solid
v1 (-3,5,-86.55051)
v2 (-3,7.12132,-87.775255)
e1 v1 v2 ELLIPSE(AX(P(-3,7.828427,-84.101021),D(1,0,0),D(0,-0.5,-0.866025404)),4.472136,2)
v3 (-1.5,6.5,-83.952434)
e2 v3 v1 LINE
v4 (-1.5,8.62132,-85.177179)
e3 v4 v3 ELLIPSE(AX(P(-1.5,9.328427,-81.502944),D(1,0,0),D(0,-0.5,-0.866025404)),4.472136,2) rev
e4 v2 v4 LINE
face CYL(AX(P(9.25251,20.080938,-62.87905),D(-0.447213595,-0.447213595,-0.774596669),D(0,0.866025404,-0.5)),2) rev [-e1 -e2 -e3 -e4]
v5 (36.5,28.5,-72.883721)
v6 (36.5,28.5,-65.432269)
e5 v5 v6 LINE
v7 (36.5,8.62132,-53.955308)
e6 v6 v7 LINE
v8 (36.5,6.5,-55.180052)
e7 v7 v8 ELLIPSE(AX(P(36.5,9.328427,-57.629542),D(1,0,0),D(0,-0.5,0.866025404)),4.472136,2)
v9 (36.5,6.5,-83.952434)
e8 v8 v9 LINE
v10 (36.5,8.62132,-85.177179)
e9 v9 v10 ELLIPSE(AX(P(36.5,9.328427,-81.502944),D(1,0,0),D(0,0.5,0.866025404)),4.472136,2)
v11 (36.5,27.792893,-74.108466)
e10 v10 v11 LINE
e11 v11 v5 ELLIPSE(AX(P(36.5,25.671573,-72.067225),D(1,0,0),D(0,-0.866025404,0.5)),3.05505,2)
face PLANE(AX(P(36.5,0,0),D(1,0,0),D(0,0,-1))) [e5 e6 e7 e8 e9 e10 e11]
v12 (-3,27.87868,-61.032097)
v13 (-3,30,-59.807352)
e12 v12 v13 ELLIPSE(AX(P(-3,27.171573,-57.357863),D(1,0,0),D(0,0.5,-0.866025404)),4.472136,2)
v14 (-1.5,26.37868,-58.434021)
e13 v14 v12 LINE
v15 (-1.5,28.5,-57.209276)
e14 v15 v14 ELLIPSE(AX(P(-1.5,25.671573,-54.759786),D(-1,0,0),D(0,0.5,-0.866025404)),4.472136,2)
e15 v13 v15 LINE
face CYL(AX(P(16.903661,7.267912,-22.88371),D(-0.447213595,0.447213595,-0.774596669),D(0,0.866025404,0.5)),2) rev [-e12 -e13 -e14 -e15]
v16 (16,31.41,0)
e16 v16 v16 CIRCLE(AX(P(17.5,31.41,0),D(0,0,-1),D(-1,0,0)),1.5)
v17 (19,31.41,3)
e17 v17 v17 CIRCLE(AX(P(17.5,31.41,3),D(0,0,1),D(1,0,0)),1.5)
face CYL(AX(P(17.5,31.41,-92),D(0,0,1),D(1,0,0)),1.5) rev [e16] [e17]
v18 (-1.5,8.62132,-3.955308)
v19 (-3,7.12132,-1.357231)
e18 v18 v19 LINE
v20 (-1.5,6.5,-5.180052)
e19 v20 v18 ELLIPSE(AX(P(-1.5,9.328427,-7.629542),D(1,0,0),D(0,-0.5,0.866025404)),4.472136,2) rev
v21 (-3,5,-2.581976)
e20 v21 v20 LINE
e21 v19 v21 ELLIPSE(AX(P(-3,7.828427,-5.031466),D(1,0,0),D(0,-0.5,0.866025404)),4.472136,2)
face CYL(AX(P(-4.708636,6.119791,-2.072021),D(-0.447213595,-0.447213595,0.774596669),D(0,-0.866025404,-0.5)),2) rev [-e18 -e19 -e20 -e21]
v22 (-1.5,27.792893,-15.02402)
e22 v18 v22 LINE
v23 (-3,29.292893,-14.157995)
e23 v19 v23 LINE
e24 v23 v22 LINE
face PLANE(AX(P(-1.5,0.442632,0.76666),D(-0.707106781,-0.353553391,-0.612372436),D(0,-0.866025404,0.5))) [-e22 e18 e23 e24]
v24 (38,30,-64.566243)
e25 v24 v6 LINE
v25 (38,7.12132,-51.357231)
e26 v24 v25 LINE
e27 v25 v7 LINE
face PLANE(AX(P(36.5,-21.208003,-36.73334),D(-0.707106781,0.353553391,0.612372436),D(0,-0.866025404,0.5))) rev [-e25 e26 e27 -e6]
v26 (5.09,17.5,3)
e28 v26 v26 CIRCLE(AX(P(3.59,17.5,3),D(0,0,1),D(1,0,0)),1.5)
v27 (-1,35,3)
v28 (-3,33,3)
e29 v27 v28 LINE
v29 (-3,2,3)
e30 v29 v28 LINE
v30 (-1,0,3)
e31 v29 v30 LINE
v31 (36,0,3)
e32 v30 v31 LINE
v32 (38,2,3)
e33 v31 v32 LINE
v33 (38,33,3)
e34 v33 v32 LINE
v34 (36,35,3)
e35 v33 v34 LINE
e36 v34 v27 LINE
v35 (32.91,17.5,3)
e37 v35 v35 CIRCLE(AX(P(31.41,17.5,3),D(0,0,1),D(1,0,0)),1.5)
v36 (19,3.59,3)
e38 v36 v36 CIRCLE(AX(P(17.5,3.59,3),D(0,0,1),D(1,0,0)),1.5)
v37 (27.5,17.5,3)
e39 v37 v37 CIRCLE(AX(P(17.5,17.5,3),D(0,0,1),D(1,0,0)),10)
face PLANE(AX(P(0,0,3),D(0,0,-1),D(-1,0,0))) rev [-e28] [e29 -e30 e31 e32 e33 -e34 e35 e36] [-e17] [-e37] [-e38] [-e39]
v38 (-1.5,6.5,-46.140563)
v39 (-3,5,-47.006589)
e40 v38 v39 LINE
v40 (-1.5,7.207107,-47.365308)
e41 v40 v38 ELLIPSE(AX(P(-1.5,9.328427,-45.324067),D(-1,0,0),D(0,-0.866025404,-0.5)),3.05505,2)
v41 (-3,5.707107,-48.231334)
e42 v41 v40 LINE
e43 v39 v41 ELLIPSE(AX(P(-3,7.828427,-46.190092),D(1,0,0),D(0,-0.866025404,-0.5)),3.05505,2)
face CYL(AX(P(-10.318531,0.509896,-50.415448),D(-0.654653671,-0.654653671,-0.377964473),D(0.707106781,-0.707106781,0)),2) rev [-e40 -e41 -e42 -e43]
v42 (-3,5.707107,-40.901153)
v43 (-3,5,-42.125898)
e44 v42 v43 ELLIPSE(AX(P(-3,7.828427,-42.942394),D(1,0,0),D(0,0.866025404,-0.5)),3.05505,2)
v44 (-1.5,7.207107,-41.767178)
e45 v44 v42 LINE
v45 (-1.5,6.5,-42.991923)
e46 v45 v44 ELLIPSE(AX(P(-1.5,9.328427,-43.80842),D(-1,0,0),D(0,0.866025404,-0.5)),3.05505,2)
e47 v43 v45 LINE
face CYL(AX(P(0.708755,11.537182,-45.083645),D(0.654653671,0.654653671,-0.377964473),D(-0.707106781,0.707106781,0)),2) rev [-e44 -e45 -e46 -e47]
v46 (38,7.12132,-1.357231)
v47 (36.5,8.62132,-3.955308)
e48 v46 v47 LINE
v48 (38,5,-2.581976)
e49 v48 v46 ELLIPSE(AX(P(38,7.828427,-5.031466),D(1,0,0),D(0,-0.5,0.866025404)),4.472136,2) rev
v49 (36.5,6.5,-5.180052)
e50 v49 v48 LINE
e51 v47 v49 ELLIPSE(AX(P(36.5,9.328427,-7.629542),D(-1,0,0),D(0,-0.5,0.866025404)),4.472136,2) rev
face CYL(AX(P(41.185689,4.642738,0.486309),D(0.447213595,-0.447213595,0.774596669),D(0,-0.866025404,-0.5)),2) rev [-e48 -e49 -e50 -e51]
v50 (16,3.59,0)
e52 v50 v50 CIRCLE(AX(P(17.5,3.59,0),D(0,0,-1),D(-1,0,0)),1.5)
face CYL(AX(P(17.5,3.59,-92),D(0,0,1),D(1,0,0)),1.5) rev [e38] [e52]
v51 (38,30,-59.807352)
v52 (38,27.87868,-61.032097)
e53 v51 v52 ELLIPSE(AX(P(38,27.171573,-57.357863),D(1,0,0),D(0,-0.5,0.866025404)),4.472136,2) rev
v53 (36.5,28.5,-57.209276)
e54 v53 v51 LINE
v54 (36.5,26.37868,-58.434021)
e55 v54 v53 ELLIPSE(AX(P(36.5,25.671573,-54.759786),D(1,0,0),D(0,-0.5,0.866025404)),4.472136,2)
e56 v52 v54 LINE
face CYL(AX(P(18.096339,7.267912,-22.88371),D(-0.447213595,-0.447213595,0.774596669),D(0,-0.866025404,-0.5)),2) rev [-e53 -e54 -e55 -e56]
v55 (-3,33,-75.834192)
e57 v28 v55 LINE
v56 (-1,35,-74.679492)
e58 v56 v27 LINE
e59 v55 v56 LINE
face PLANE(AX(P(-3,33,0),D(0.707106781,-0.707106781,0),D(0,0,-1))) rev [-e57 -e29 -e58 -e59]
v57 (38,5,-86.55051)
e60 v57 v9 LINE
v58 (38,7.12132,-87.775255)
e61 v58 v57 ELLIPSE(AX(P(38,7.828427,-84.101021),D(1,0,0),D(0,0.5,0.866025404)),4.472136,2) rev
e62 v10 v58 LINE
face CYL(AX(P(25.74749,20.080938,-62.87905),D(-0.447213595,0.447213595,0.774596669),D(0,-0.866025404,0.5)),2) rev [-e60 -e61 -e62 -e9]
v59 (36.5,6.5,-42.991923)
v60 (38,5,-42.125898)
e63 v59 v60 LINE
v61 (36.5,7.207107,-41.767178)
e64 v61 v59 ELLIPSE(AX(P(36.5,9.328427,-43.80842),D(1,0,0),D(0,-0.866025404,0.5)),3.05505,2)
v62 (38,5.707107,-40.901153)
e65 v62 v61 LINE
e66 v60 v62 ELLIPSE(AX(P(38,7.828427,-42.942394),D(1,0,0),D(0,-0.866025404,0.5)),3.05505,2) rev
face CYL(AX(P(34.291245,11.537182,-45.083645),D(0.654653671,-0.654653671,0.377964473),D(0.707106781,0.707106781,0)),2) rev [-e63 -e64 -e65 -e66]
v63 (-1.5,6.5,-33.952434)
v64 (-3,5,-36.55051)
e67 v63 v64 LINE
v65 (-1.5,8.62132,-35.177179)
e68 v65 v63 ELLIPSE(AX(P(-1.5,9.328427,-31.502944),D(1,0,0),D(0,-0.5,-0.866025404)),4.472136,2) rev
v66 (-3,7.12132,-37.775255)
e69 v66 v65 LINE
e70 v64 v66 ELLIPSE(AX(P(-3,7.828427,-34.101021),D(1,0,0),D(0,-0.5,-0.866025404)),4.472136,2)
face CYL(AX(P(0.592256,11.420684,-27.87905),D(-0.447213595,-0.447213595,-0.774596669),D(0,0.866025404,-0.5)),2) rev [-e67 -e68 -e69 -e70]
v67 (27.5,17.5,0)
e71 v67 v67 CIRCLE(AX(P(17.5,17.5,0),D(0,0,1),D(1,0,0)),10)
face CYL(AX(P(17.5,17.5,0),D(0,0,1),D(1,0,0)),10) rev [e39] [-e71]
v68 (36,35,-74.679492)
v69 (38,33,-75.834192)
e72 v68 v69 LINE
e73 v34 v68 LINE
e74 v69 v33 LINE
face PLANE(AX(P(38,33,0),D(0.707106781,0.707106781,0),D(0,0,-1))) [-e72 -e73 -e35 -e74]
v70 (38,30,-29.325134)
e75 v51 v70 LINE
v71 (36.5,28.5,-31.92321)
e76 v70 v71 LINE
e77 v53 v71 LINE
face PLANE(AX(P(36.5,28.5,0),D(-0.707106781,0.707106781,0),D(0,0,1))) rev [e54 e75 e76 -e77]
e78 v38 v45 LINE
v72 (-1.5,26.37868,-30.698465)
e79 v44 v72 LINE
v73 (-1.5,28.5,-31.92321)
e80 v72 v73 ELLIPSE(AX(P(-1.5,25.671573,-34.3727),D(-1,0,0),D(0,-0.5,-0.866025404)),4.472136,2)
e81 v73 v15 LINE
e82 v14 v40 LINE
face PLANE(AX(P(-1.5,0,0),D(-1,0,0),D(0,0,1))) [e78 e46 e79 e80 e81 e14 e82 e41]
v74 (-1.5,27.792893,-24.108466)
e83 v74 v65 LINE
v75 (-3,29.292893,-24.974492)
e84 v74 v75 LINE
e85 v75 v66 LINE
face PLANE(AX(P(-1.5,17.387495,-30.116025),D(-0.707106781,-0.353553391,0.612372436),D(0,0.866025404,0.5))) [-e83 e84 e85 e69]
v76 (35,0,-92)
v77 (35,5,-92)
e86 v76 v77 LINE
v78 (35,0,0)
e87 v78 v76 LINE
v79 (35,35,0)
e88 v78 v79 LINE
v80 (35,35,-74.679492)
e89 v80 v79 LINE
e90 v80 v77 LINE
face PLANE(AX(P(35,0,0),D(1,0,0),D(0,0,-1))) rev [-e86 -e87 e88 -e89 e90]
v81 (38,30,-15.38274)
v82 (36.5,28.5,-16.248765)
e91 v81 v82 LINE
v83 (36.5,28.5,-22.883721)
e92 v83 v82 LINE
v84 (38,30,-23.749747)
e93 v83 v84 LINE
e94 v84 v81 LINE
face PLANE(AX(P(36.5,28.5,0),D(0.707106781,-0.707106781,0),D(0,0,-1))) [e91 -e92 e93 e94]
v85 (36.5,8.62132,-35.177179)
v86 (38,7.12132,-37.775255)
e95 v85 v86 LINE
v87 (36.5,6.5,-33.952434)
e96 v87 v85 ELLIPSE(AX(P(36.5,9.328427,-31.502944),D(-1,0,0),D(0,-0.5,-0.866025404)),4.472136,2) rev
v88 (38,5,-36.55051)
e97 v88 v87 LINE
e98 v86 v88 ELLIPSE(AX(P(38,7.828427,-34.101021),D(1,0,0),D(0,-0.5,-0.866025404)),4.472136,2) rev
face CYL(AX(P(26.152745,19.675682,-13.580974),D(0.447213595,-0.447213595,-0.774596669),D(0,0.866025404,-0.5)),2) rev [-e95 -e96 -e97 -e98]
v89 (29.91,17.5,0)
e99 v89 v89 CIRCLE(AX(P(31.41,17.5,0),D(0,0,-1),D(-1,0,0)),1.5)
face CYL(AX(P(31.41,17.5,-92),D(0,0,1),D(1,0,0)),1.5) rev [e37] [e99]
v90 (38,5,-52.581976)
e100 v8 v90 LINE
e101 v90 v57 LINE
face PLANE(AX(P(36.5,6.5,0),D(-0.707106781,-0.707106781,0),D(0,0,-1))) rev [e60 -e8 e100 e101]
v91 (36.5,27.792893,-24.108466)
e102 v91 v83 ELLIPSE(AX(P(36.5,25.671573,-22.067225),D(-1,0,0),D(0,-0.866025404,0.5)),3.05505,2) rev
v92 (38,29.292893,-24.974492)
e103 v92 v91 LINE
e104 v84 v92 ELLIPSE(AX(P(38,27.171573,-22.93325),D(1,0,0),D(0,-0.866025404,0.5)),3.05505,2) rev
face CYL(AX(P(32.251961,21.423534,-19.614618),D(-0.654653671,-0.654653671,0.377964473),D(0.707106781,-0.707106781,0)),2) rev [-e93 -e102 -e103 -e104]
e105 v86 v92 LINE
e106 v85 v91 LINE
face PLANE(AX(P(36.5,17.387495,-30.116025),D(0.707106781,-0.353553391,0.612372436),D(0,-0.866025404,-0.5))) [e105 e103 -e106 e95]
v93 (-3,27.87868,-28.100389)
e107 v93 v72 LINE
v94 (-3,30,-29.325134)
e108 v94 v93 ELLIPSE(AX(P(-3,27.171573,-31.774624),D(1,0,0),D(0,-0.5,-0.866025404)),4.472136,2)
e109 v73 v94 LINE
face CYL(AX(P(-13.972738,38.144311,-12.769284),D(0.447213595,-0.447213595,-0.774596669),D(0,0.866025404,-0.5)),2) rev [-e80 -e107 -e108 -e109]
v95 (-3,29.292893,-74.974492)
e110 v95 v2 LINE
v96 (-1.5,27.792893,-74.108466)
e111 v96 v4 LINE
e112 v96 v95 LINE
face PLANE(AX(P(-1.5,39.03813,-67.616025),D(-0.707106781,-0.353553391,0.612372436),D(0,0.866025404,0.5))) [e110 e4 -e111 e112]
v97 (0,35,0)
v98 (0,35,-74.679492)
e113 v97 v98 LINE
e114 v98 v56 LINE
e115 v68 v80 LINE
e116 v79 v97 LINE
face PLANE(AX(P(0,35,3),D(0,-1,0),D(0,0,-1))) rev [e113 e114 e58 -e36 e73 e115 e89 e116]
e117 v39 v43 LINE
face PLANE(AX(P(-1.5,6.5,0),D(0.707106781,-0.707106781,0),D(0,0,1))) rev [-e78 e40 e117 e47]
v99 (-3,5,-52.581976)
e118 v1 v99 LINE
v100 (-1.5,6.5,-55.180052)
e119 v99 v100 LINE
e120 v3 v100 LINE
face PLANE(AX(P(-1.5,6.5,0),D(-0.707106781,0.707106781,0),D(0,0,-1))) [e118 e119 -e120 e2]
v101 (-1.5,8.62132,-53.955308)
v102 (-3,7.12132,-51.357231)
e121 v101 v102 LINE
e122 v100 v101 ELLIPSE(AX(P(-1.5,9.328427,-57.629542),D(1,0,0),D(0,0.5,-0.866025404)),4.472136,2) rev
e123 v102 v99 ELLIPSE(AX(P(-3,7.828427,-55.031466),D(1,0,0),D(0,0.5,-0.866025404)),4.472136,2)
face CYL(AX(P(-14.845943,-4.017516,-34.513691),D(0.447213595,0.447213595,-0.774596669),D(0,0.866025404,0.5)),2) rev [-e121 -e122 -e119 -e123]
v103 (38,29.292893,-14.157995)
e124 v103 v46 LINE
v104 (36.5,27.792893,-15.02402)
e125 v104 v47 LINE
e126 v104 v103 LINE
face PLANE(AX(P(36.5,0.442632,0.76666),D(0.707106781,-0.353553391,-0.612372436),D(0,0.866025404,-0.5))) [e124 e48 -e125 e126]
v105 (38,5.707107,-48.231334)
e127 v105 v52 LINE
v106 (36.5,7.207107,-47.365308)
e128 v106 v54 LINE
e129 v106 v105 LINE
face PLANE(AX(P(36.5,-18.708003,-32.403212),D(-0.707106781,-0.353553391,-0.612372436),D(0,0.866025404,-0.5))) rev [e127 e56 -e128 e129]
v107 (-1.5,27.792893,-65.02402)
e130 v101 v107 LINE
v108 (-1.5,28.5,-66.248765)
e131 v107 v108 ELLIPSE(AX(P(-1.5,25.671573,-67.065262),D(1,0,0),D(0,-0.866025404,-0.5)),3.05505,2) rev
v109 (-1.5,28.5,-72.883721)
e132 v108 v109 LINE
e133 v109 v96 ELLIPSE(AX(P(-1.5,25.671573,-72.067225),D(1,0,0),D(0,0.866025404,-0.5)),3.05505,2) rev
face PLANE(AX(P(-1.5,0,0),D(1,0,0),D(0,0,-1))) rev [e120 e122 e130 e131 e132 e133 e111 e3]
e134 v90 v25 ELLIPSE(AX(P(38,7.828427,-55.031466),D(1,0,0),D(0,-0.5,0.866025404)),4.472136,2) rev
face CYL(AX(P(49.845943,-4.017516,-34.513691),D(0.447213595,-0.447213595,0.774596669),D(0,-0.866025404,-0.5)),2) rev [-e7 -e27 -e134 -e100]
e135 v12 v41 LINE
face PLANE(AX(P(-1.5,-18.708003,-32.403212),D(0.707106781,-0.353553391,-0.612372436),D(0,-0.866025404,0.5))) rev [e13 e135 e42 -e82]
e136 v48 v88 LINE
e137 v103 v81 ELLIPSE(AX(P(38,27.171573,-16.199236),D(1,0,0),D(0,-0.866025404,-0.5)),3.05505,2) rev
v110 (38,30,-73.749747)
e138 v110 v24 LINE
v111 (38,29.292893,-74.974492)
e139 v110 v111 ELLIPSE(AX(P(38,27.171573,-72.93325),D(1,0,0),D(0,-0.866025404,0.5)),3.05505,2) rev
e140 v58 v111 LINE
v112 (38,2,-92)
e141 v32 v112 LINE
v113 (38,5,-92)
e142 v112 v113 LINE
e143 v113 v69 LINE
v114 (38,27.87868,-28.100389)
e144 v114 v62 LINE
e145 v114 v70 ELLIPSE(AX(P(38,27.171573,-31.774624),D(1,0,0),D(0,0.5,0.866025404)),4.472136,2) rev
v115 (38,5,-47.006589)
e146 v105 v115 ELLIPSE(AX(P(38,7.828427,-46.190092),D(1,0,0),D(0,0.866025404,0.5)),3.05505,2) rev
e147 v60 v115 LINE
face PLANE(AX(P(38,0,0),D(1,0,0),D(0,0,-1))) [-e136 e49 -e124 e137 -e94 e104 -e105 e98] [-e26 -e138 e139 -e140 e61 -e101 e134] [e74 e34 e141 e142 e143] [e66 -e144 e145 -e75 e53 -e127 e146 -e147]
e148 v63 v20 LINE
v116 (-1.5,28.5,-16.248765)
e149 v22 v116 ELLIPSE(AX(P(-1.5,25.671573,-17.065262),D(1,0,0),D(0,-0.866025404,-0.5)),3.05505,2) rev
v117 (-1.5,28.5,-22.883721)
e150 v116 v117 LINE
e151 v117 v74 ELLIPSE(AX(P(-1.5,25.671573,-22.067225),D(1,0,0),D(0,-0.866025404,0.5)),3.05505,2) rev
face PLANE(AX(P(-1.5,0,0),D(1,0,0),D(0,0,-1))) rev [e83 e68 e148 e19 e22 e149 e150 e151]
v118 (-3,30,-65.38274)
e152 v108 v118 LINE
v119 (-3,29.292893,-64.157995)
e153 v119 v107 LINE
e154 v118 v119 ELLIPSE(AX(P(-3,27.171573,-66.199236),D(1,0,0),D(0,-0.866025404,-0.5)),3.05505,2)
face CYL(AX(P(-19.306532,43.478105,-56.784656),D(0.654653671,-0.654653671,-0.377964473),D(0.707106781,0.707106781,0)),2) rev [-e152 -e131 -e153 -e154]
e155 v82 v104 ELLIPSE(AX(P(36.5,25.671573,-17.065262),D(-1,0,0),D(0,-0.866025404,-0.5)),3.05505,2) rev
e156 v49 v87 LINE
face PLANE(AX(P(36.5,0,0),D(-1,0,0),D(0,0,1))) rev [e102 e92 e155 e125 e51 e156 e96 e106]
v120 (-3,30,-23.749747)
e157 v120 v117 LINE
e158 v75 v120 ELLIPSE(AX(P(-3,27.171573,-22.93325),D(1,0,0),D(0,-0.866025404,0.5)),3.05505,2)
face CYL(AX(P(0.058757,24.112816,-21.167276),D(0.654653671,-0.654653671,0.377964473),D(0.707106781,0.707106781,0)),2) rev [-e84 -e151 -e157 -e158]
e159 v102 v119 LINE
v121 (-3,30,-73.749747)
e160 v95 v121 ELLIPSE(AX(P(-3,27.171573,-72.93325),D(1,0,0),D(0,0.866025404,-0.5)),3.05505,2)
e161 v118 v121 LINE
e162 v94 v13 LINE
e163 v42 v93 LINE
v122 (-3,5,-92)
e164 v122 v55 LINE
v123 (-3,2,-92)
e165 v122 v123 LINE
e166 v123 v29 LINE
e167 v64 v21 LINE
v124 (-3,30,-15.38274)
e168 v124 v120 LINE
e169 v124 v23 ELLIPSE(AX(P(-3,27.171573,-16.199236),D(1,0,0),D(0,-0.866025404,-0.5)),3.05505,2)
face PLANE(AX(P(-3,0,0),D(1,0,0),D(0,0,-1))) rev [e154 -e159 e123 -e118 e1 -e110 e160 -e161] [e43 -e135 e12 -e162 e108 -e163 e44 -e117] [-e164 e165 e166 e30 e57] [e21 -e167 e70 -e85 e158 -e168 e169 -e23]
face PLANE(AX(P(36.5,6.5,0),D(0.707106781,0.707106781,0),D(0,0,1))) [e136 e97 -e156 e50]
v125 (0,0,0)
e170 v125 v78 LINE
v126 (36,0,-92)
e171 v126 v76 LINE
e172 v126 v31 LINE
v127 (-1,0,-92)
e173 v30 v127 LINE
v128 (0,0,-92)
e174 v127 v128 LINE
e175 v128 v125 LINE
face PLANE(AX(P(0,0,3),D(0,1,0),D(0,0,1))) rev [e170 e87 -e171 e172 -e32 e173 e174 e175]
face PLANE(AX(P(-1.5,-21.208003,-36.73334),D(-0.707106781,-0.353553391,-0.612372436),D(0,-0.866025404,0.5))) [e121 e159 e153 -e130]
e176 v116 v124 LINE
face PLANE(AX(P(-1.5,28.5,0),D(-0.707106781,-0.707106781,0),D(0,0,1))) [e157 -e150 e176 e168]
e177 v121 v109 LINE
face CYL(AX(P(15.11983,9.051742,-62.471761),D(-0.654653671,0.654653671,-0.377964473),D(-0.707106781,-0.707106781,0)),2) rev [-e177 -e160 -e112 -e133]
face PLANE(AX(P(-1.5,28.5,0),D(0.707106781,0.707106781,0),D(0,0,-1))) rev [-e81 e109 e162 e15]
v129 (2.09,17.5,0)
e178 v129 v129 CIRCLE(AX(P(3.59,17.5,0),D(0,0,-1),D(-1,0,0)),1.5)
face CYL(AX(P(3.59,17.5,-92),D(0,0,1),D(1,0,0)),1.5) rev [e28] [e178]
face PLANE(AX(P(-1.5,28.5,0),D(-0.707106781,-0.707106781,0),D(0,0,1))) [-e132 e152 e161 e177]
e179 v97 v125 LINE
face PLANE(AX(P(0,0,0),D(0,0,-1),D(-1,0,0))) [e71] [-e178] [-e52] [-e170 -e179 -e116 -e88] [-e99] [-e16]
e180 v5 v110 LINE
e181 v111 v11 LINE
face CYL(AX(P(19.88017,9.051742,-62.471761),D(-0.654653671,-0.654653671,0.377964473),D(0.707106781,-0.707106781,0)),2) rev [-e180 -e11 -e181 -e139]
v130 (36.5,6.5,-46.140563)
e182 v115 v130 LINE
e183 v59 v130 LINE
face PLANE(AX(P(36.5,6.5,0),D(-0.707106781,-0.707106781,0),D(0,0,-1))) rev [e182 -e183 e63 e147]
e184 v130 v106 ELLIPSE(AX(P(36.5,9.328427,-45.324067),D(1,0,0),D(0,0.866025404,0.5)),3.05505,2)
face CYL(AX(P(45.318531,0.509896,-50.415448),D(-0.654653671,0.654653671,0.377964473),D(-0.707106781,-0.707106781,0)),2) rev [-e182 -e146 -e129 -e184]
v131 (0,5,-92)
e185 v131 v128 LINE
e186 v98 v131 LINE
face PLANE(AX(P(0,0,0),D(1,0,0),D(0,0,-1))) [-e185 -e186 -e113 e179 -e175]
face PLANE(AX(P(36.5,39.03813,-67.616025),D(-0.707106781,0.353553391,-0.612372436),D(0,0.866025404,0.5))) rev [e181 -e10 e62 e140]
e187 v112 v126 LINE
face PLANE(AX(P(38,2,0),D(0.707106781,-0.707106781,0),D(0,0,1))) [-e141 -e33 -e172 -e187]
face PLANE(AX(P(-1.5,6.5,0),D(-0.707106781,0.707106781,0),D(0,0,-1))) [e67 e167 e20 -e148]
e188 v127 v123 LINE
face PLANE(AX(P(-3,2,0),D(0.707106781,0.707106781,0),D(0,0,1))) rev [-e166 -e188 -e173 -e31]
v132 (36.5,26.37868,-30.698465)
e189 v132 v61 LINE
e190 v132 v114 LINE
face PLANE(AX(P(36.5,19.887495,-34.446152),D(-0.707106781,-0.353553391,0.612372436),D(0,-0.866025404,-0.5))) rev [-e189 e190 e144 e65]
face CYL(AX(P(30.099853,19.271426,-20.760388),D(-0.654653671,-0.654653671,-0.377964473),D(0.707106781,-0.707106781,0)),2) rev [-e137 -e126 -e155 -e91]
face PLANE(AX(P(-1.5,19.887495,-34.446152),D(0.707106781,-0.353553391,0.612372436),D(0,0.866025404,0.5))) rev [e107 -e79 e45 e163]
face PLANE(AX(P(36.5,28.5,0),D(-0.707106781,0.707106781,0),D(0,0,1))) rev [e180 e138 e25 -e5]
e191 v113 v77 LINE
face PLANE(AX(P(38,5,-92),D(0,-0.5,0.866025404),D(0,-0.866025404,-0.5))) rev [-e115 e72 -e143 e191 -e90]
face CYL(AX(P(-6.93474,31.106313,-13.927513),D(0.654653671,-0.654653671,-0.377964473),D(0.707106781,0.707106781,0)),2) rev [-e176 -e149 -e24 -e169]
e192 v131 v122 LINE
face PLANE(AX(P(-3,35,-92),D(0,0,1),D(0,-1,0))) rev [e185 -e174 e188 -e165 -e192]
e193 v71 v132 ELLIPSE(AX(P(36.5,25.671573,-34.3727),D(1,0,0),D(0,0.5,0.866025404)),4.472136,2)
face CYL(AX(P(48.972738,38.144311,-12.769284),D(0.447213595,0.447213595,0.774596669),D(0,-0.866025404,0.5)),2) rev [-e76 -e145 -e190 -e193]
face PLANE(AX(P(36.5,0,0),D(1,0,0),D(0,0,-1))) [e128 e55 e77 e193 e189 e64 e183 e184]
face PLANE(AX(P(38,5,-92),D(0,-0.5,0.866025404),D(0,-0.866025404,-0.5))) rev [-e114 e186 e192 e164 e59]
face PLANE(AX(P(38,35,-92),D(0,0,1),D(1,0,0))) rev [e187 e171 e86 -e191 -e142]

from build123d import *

# Parameters (mm, degrees)
SKETCH1_W           = 35
SKETCH1_H           = 35
BOSS_EXTRUDE1_DEPTH = 3
SKETCH2_R           = 10
CUT_EXTRUDE1_DEPTH  = 50.588305073
SKETCH4_W           = 95
SKETCH4_H           = 35
BOSS_EXTRUDE2_DEPTH = 3
SKETCH6_W           = 95
SKETCH6_H           = 35
BOSS_EXTRUDE5_DEPTH = 3
CHAMFER1_SIZE       = 2
CUT_EXTRUDE3_DEPTH  = 1.5
CUT_EXTRUDE4_DEPTH  = 1.5
CUT_EXTRUDE5_DEPTH  = 1.5
CHAMFER3_SIZE       = 1.5
CUT_EXTRUDE6_DEPTH  = 107.630202101
SKETCH11_R          = 1.5
CUT_EXTRUDE7_DEPTH  = 109.138799697
FILLET3_R           = 2


# Some blends are built 0.0001 mm under size
with BuildPart() as part:
    # Sketch1 → Boss-Extrude1 (new body)
    with BuildSketch(Plane.XY):
        with Locations((17.5, 17.5)):
            Rectangle(SKETCH1_W, SKETCH1_H)
    extrude(amount=BOSS_EXTRUDE1_DEPTH)

    # Sketch2 → Cut-Extrude1 (cut, through all)
    with BuildSketch(Plane.XY.offset(3)):
        with Locations((17.5, 17.5)):
            Circle(SKETCH2_R)
    extrude(amount=-CUT_EXTRUDE1_DEPTH, mode=Mode.SUBTRACT)

    # Sketch4 → Boss-Extrude2 (add)
    with BuildSketch(Plane.ZY):
        with Locations((-44.5, 17.5)):
            Rectangle(SKETCH4_W, SKETCH4_H)
    extrude(amount=BOSS_EXTRUDE2_DEPTH)

    # Sketch6 → Boss-Extrude5 (add)
    with BuildSketch(Plane(origin=(35, 0, 0), x_dir=(0, 0, -1), z_dir=(1, 0, 0))):
        with Locations((44.5, 17.5)):
            Rectangle(SKETCH6_W, SKETCH6_H)
    extrude(amount=BOSS_EXTRUDE5_DEPTH)

    # Chamfer1
    chamfer1_edges = [part.edges().sort_by_distance(p)[0] for p in [
        (-3, 35, -44.5),
        (-3, 0, -44.5),
        (38, 0, -44.5),
        (38, 35, -44.5),
    ]]
    chamfer(chamfer1_edges, length=CHAMFER1_SIZE)

    # Sketch7 → Cut-Extrude3 (cut)
    with BuildSketch(Plane.ZY.offset(3)):
        Polygon((-89, 5), (-50.132486541, 5), (-64.56624327, 30), (-74.56624327, 30), align=None)
        Polygon((-39, 5), (-24.56624327, 30), (-14.56624327, 30), (-0.132486541, 5), align=None)
    extrude(amount=-CUT_EXTRUDE3_DEPTH, mode=Mode.SUBTRACT)

    # Sketch8 → Cut-Extrude4 (cut)
    with BuildSketch(Plane.ZY.offset(3)):
        Polygon((-47.823085464, 5), (-41.309401077, 5), (-26.875644347, 30), (-62.256842194, 30), align=None)
    extrude(amount=-CUT_EXTRUDE4_DEPTH, mode=Mode.SUBTRACT)

    # Sketch9 → Cut-Extrude5 (cut)
    with BuildSketch(Plane(origin=(38, 0, 0), x_dir=(0, 0, -1), z_dir=(1, 0, 0))):
        Polygon((0.132486541, 5), (14.56624327, 30), (24.56624327, 30), (39, 5), align=None)
        Polygon((41.309401077, 5), (47.823085464, 5), (62.256842194, 30), (26.875644347, 30), align=None)
        Polygon((50.132486541, 5), (89, 5), (74.56624327, 30), (64.56624327, 30), align=None)
    extrude(amount=-CUT_EXTRUDE5_DEPTH, mode=Mode.SUBTRACT)

    # Chamfer3
    chamfer3_edges = [part.edges().sort_by_distance(p)[0] for p in [
        (-1.5, 17.5, -31.783121635),
        (-1.5, 30, -19.56624327),
        (-1.5, 17.5, -7.349364905),
        (-1.5, 5, -19.56624327),
        (-1.5, 30, -44.56624327),
        (-1.5, 17.5, -34.092522712),
        (-1.5, 5, -44.56624327),
        (-1.5, 17.5, -55.039963829),
        (-1.5, 30, -69.56624327),
        (-1.5, 17.5, -57.349364905),
        (-1.5, 5, -69.56624327),
        (-1.5, 17.5, -81.783121635),
        (36.5, 30, -69.56624327),
        (36.5, 17.5, -81.783121635),
        (36.5, 5, -69.56624327),
        (36.5, 17.5, -57.349364905),
        (36.5, 30, -44.56624327),
        (36.5, 17.5, -55.039963829),
        (36.5, 5, -44.56624327),
        (36.5, 17.5, -34.092522712),
        (36.5, 17.5, -7.349364905),
        (36.5, 30, -19.56624327),
        (36.5, 17.5, -31.783121635),
        (36.5, 5, -19.56624327),
    ]]
    chamfer(chamfer3_edges, length=CHAMFER3_SIZE - 0.0001)  # a hair under: the kernel refuses the full size

    # Sketch10 → Cut-Extrude6 (cut, through all)
    with BuildSketch(Plane.ZY.offset(3)):
        Polygon((-92, 5), (-74.679491924, 35), (-92, 35), align=None)
    extrude(amount=-CUT_EXTRUDE6_DEPTH, mode=Mode.SUBTRACT)

    # Sketch11 → Cut-Extrude7 (cut, through all)
    with BuildSketch(Plane.XY.offset(3)):
        with Locations((17.5, 31.41)):
            Circle(SKETCH11_R)
        with Locations((31.41, 17.5)):
            Circle(SKETCH11_R)
        with Locations((17.5, 3.59)):
            Circle(SKETCH11_R)
        with Locations((3.59, 17.5)):
            Circle(SKETCH11_R)
    extrude(amount=-CUT_EXTRUDE7_DEPTH, mode=Mode.SUBTRACT)

    # Fillet3
    # the kernel refuses this fillet: 2 mm, written as the material it adds along each edge
    with BuildSketch(Plane(origin=(-4.237079148, 31.237179148, -13.851957556), x_dir=(-0.26726124191242534, -0.6681531047810635, 0.6943650748294108), z_dir=(0.6546536707079771, -0.6546536707079762, -0.37796447300922925))) as fillet3_piece_1_section:
        with BuildLine():
            CenterArc((FILLET3_R * 0.377964473009, FILLET3_R), FILLET3_R, 228.590377891, 41.409622109)
            Line((-FILLET3_R * 0.283473354757, FILLET3_R * 0.25), (0, 0))
            Line((0, 0), (FILLET3_R * 0.377964473009, 0))
        make_face()
    fillet3_piece_1 = extrude(amount=6.070779825, mode=Mode.PRIVATE)
    fillet3_piece_1 = split(fillet3_piece_1, bisect_by=Plane(origin=(-3, 30.0000375, -14.56622162), z_dir=(1, 0, 0)), keep=Keep.TOP, mode=Mode.PRIVATE)
    add(fillet3_piece_1)
    with BuildSketch(Plane(origin=(-4.731950808, 3.267949192, 2.867513459), x_dir=(-0.5477225575051657, -0.5477225575051657, -0.6324555320336765), z_dir=(0.4472135954999585, 0.4472135954999585, -0.7745966692414828))) as fillet3_piece_2_section:
        with BuildLine():
            CenterArc((FILLET3_R * 0.774596669241, FILLET3_R), FILLET3_R, 194.477512186, 75.522487814)
            Line((-FILLET3_R * 0.19364916731, FILLET3_R * 0.75), (0, 0))
            Line((0, 0), (FILLET3_R * 0.774596669241, 0))
        make_face()
    fillet3_piece_2 = extrude(amount=11.099845052, mode=Mode.PRIVATE)
    fillet3_piece_2 = split(fillet3_piece_2, bisect_by=Plane(origin=(-3, 6.208026651, -2.224850076), z_dir=(1, 0, 0)), keep=Keep.TOP, mode=Mode.PRIVATE)
    fillet3_piece_2 = split(fillet3_piece_2, bisect_by=Plane(origin=(-1.5, 6.208026651, -2.224850076), z_dir=(-1, 0, 0)), keep=Keep.TOP, mode=Mode.PRIVATE)
    add(fillet3_piece_2)
    with BuildSketch(Plane(origin=(-4.237079148, 31.237179148, -25.280528985), x_dir=(-0.2672612419124285, -0.6681531047810648, -0.6943650748294081), z_dir=(0.6546536707079759, -0.6546536707079768, 0.3779644730092301))) as fillet3_piece_3_section:
        with BuildLine():
            CenterArc((FILLET3_R * 0.377964473009, -FILLET3_R), FILLET3_R, 90, 41.409622109)
            Line((-FILLET3_R * 0.283473354757, -FILLET3_R * 0.25), (0, 0))
            Line((0, 0), (FILLET3_R * 0.377964473009, 0))
        make_face()
    fillet3_piece_3 = extrude(amount=6.070779825, mode=Mode.PRIVATE)
    fillet3_piece_3 = split(fillet3_piece_3, bisect_by=Plane(origin=(-3, 30.0000375, -24.566264921), z_dir=(1, 0, 0)), keep=Keep.TOP, mode=Mode.PRIVATE)
    add(fillet3_piece_3)
    with BuildSketch(Plane(origin=(-4.731950808, 3.267949192, -42), x_dir=(-0.5477225575051646, -0.5477225575051644, 0.6324555320336788), z_dir=(0.44721359549996004, 0.44721359549996004, 0.7745966692414811))) as fillet3_piece_4_section:
        with BuildLine():
            CenterArc((FILLET3_R * 0.774596669241, -FILLET3_R), FILLET3_R, 90, 75.522487814)
            Line((-FILLET3_R * 0.19364916731, -FILLET3_R * 0.75), (0, 0))
            Line((0, 0), (FILLET3_R * 0.774596669241, 0))
        make_face()
    fillet3_piece_4 = extrude(amount=11.099845052, mode=Mode.PRIVATE)
    fillet3_piece_4 = split(fillet3_piece_4, bisect_by=Plane(origin=(-3, 6.208026651, -36.907636464), z_dir=(1, 0, 0)), keep=Keep.TOP, mode=Mode.PRIVATE)
    fillet3_piece_4 = split(fillet3_piece_4, bisect_by=Plane(origin=(-1.5, 6.208026651, -36.907636464), z_dir=(-1, 0, 0)), keep=Keep.TOP, mode=Mode.PRIVATE)
    add(fillet3_piece_4)
    with BuildSketch(Plane(origin=(-4.237079148, 3.762820852, -40.595115362), x_dir=(-0.26726124191242456, -0.26726124191242456, -0.9258200997725514), z_dir=(0.6546536707079772, 0.6546536707079771, -0.3779644730092275))) as fillet3_piece_5_section:
        with BuildLine():
            CenterArc((FILLET3_R * 0.377964473009, FILLET3_R), FILLET3_R, 228.590377891, 41.409622109)
            Line((-FILLET3_R * 0.283473354757, FILLET3_R * 0.25), (0, 0))
            Line((0, 0), (FILLET3_R * 0.377964473009, 0))
        make_face()
    fillet3_piece_5 = extrude(amount=6.070779825, mode=Mode.PRIVATE)
    fillet3_piece_5 = split(fillet3_piece_5, bisect_by=Plane(origin=(-3, 4.9999625, -41.309379426), z_dir=(1, 0, 0)), keep=Keep.TOP, mode=Mode.PRIVATE)
    add(fillet3_piece_5)
    with BuildSketch(Plane(origin=(-4.237079148, 3.762820852, -48.537371178), x_dir=(-0.26726124191242456, -0.267261241912424, 0.9258200997725515), z_dir=(0.6546536707079772, 0.6546536707079773, 0.37796447300922714))) as fillet3_piece_6_section:
        with BuildLine():
            CenterArc((FILLET3_R * 0.377964473009, -FILLET3_R), FILLET3_R, 90, 41.409622109)
            Line((-FILLET3_R * 0.283473354757, -FILLET3_R * 0.25), (0, 0))
            Line((0, 0), (FILLET3_R * 0.377964473009, 0))
        make_face()
    fillet3_piece_6 = extrude(amount=6.070779825, mode=Mode.PRIVATE)
    fillet3_piece_6 = split(fillet3_piece_6, bisect_by=Plane(origin=(-3, 4.9999625, -47.823107114), z_dir=(1, 0, 0)), keep=Keep.TOP, mode=Mode.PRIVATE)
    add(fillet3_piece_6)
    with BuildSketch(Plane(origin=(-4.731950808, 31.732050808, -23.875644347), x_dir=(-0.5477225575051662, -0.8215838362577491, 0.1581138830084191), z_dir=(0.44721359549995787, -0.44721359549995815, -0.7745966692414833))) as fillet3_piece_7_section:
        with BuildLine():
            CenterArc((FILLET3_R * 0.774596669241, FILLET3_R), FILLET3_R, 194.477512186, 75.522487814)
            Line((-FILLET3_R * 0.19364916731, FILLET3_R * 0.75), (0, 0))
            Line((0, 0), (FILLET3_R * 0.774596669241, 0))
        make_face()
    fillet3_piece_7 = extrude(amount=11.099845052, mode=Mode.PRIVATE)
    fillet3_piece_7 = split(fillet3_piece_7, bisect_by=Plane(origin=(-3, 28.791973349, -28.968007883), z_dir=(1, 0, 0)), keep=Keep.TOP, mode=Mode.PRIVATE)
    fillet3_piece_7 = split(fillet3_piece_7, bisect_by=Plane(origin=(0, 28.791973349, -28.968007883), z_dir=(-1, 0, 0)), keep=Keep.TOP, mode=Mode.PRIVATE)
    add(fillet3_piece_7)
    with BuildSketch(Plane(origin=(-4.731950808, 31.732050808, -65.256842194), x_dir=(-0.5477225575051665, -0.821583836257749, -0.15811388300841855), z_dir=(0.4472135954999584, -0.44721359549995815, 0.7745966692414831))) as fillet3_piece_8_section:
        with BuildLine():
            CenterArc((FILLET3_R * 0.774596669241, -FILLET3_R), FILLET3_R, 90, 75.522487814)
            Line((-FILLET3_R * 0.19364916731, -FILLET3_R * 0.75), (0, 0))
            Line((0, 0), (FILLET3_R * 0.774596669241, 0))
        make_face()
    fillet3_piece_8 = extrude(amount=11.099845052, mode=Mode.PRIVATE)
    fillet3_piece_8 = split(fillet3_piece_8, bisect_by=Plane(origin=(-3, 28.791973349, -60.164478658), z_dir=(1, 0, 0)), keep=Keep.TOP, mode=Mode.PRIVATE)
    fillet3_piece_8 = split(fillet3_piece_8, bisect_by=Plane(origin=(0, 28.791973349, -60.164478658), z_dir=(-1, 0, 0)), keep=Keep.TOP, mode=Mode.PRIVATE)
    add(fillet3_piece_8)
    with BuildSketch(Plane(origin=(-4.731950808, 3.267949192, -47.132486541), x_dir=(-0.5477225575051652, -0.5477225575051655, -0.6324555320336772), z_dir=(0.4472135954999589, 0.447213595499959, -0.7745966692414823))) as fillet3_piece_9_section:
        with BuildLine():
            CenterArc((FILLET3_R * 0.774596669241, FILLET3_R), FILLET3_R, 194.477512186, 75.522487814)
            Line((-FILLET3_R * 0.19364916731, FILLET3_R * 0.75), (0, 0))
            Line((0, 0), (FILLET3_R * 0.774596669241, 0))
        make_face()
    fillet3_piece_9 = extrude(amount=11.099845052, mode=Mode.PRIVATE)
    fillet3_piece_9 = split(fillet3_piece_9, bisect_by=Plane(origin=(-3, 6.208026651, -52.224850076), z_dir=(1, 0, 0)), keep=Keep.TOP, mode=Mode.PRIVATE)
    fillet3_piece_9 = split(fillet3_piece_9, bisect_by=Plane(origin=(-1.5, 6.208026651, -52.224850076), z_dir=(-1, 0, 0)), keep=Keep.TOP, mode=Mode.PRIVATE)
    add(fillet3_piece_9)
    with BuildSketch(Plane(origin=(-4.731950808, 3.267949192, -92), x_dir=(-0.5477225575051636, -0.5477225575051639, 0.63245553203368), z_dir=(0.4472135954999609, 0.44721359549996087, 0.7745966692414801))) as fillet3_piece_10_section:
        with BuildLine():
            CenterArc((FILLET3_R * 0.774596669241, -FILLET3_R), FILLET3_R, 90, 75.522487814)
            Line((-FILLET3_R * 0.19364916731, -FILLET3_R * 0.75), (0, 0))
            Line((0, 0), (FILLET3_R * 0.774596669241, 0))
        make_face()
    fillet3_piece_10 = extrude(amount=11.099845052, mode=Mode.PRIVATE)
    fillet3_piece_10 = split(fillet3_piece_10, bisect_by=Plane(origin=(-3, 6.208026651, -86.907636464), z_dir=(1, 0, 0)), keep=Keep.TOP, mode=Mode.PRIVATE)
    fillet3_piece_10 = split(fillet3_piece_10, bisect_by=Plane(origin=(-1.5, 6.208026651, -86.907636464), z_dir=(-1, 0, 0)), keep=Keep.TOP, mode=Mode.PRIVATE)
    add(fillet3_piece_10)
    with BuildSketch(Plane(origin=(-4.237079148, 31.237179148, -63.851957556), x_dir=(-0.2672612419124199, -0.6681531047810638, 0.6943650748294127), z_dir=(0.6546536707079784, -0.6546536707079738, -0.377964473009231))) as fillet3_piece_11_section:
        with BuildLine():
            CenterArc((FILLET3_R * 0.377964473009, FILLET3_R), FILLET3_R, 228.590377891, 41.409622109)
            Line((-FILLET3_R * 0.283473354757, FILLET3_R * 0.25), (0, 0))
            Line((0, 0), (FILLET3_R * 0.377964473009, 0))
        make_face()
    fillet3_piece_11 = extrude(amount=6.070779825, mode=Mode.PRIVATE)
    fillet3_piece_11 = split(fillet3_piece_11, bisect_by=Plane(origin=(-3, 30.0000375, -64.56622162), z_dir=(1, 0, 0)), keep=Keep.TOP, mode=Mode.PRIVATE)
    add(fillet3_piece_11)
    with BuildSketch(Plane(origin=(-4.237079148, 31.237179148, -75.280528985), x_dir=(-0.2672612419124319, -0.6681531047810608, -0.6943650748294108), z_dir=(0.6546536707079755, -0.6546536707079802, 0.37796447300922503))) as fillet3_piece_12_section:
        with BuildLine():
            CenterArc((FILLET3_R * 0.377964473009, -FILLET3_R), FILLET3_R, 90, 41.409622109)
            Line((-FILLET3_R * 0.283473354757, -FILLET3_R * 0.25), (0, 0))
            Line((0, 0), (FILLET3_R * 0.377964473009, 0))
        make_face()
    fillet3_piece_12 = extrude(amount=6.070779825, mode=Mode.PRIVATE)
    fillet3_piece_12 = split(fillet3_piece_12, bisect_by=Plane(origin=(-3, 30.0000375, -74.566264921), z_dir=(1, 0, 0)), keep=Keep.TOP, mode=Mode.PRIVATE)
    add(fillet3_piece_12)
    with BuildSketch(Plane(origin=(39.731950808, 3.267949192, -92), x_dir=(0.547722557505162, -0.5477225575051657, 0.6324555320336798), z_dir=(-0.44721359549996026, 0.44721359549996115, 0.7745966692414803))) as fillet3_piece_13_section:
        with BuildLine():
            CenterArc((FILLET3_R * 0.774596669241, FILLET3_R), FILLET3_R, 194.477512186, 75.522487814)
            Line((-FILLET3_R * 0.19364916731, FILLET3_R * 0.75), (0, 0))
            Line((0, 0), (FILLET3_R * 0.774596669241, 0))
        make_face()
    fillet3_piece_13 = extrude(amount=11.099845052, mode=Mode.PRIVATE)
    fillet3_piece_13 = split(fillet3_piece_13, bisect_by=Plane(origin=(38, 6.208026651, -86.907636464), z_dir=(-1, 0, 0)), keep=Keep.TOP, mode=Mode.PRIVATE)
    fillet3_piece_13 = split(fillet3_piece_13, bisect_by=Plane(origin=(36.5, 6.208026651, -86.907636464), z_dir=(1, 0, 0)), keep=Keep.TOP, mode=Mode.PRIVATE)
    add(fillet3_piece_13)
    with BuildSketch(Plane(origin=(39.731950808, 3.267949192, -47.132486541), x_dir=(0.5477225575051635, 0.8215838362577502, 0.15811388300842216), z_dir=(-0.4472135954999577, 0.44721359549995876, -0.7745966692414832))) as fillet3_piece_14_section:
        with BuildLine():
            CenterArc((FILLET3_R * 0.774596669241, FILLET3_R), FILLET3_R, 194.477512186, 75.522487814)
            Line((-FILLET3_R * 0.19364916731, FILLET3_R * 0.75), (0, 0))
            Line((0, 0), (FILLET3_R * 0.774596669241, 0))
        make_face()
    fillet3_piece_14 = extrude(amount=11.099845052, mode=Mode.PRIVATE)
    fillet3_piece_14 = split(fillet3_piece_14, bisect_by=Plane(origin=(38, 6.208026651, -52.224850076), z_dir=(-1, 0, 0)), keep=Keep.TOP, mode=Mode.PRIVATE)
    fillet3_piece_14 = split(fillet3_piece_14, bisect_by=Plane(origin=(36.5, 6.208026651, -52.224850076), z_dir=(1, 0, 0)), keep=Keep.TOP, mode=Mode.PRIVATE)
    add(fillet3_piece_14)
    with BuildSketch(Plane(origin=(39.237079148, 31.237179148, -75.280528985), x_dir=(0.2672612419124258, 0.26726124191242107, 0.9258200997725521), z_dir=(-0.654653670707975, -0.6546536707079802, 0.3779644730092258))) as fillet3_piece_15_section:
        with BuildLine():
            CenterArc((FILLET3_R * 0.377964473009, -FILLET3_R), FILLET3_R, 90, 41.409622109)
            Line((-FILLET3_R * 0.283473354757, -FILLET3_R * 0.25), (0, 0))
            Line((0, 0), (FILLET3_R * 0.377964473009, 0))
        make_face()
    fillet3_piece_15 = extrude(amount=6.070779825, mode=Mode.PRIVATE)
    fillet3_piece_15 = split(fillet3_piece_15, bisect_by=Plane(origin=(38, 30.0000375, -74.566264921), z_dir=(-1, 0, 0)), keep=Keep.TOP, mode=Mode.PRIVATE)
    add(fillet3_piece_15)
    with BuildSketch(Plane(origin=(39.237079148, 3.762820852, -48.537371178), x_dir=(0.26726124191242484, -0.26726124191242484, 0.9258200997725512), z_dir=(-0.6546536707079762, 0.6546536707079778, 0.37796447300922786))) as fillet3_piece_16_section:
        with BuildLine():
            CenterArc((FILLET3_R * 0.377964473009, FILLET3_R), FILLET3_R, 228.590377891, 41.409622109)
            Line((-FILLET3_R * 0.283473354757, FILLET3_R * 0.25), (0, 0))
            Line((0, 0), (FILLET3_R * 0.377964473009, 0))
        make_face()
    fillet3_piece_16 = extrude(amount=6.070779825, mode=Mode.PRIVATE)
    fillet3_piece_16 = split(fillet3_piece_16, bisect_by=Plane(origin=(38, 4.9999625, -47.823107114), z_dir=(-1, 0, 0)), keep=Keep.TOP, mode=Mode.PRIVATE)
    add(fillet3_piece_16)
    with BuildSketch(Plane(origin=(39.237079148, 3.762820852, -40.595115362), x_dir=(0.26726124191242373, 0.66815310478106, 0.6943650748294149), z_dir=(-0.6546536707079764, 0.6546536707079779, -0.37796447300922736))) as fillet3_piece_17_section:
        with BuildLine():
            CenterArc((FILLET3_R * 0.377964473009, FILLET3_R), FILLET3_R, 228.590377891, 41.409622109)
            Line((-FILLET3_R * 0.283473354757, FILLET3_R * 0.25), (0, 0))
            Line((0, 0), (FILLET3_R * 0.377964473009, 0))
        make_face()
    fillet3_piece_17 = extrude(amount=6.070779825, mode=Mode.PRIVATE)
    fillet3_piece_17 = split(fillet3_piece_17, bisect_by=Plane(origin=(38, 4.9999625, -41.309379426), z_dir=(-1, 0, 0)), keep=Keep.TOP, mode=Mode.PRIVATE)
    add(fillet3_piece_17)
    with BuildSketch(Plane(origin=(39.731950808, 31.732050808, -65.256842194), x_dir=(0.5477225575051664, 0.5477225575051664, 0.6324555320336754), z_dir=(-0.4472135954999572, -0.44721359549995804, 0.7745966692414837))) as fillet3_piece_18_section:
        with BuildLine():
            CenterArc((FILLET3_R * 0.774596669241, -FILLET3_R), FILLET3_R, 90, 75.522487814)
            Line((-FILLET3_R * 0.19364916731, -FILLET3_R * 0.75), (0, 0))
            Line((0, 0), (FILLET3_R * 0.774596669241, 0))
        make_face()
    fillet3_piece_18 = extrude(amount=11.099845052, mode=Mode.PRIVATE)
    fillet3_piece_18 = split(fillet3_piece_18, bisect_by=Plane(origin=(38, 28.791973349, -60.164478658), z_dir=(-1, 0, 0)), keep=Keep.TOP, mode=Mode.PRIVATE)
    fillet3_piece_18 = split(fillet3_piece_18, bisect_by=Plane(origin=(36.5, 28.791973349, -60.164478658), z_dir=(1, 0, 0)), keep=Keep.TOP, mode=Mode.PRIVATE)
    add(fillet3_piece_18)
    with BuildSketch(Plane(origin=(39.731950808, 31.732050808, -23.875644347), x_dir=(0.5477225575051664, -0.8215838362577489, 0.15811388300841975), z_dir=(-0.44721359549995715, -0.4472135954999585, -0.7745966692414836))) as fillet3_piece_19_section:
        with BuildLine():
            CenterArc((FILLET3_R * 0.774596669241, -FILLET3_R), FILLET3_R, 90, 75.522487814)
            Line((-FILLET3_R * 0.19364916731, -FILLET3_R * 0.75), (0, 0))
            Line((0, 0), (FILLET3_R * 0.774596669241, 0))
        make_face()
    fillet3_piece_19 = extrude(amount=11.099845052, mode=Mode.PRIVATE)
    fillet3_piece_19 = split(fillet3_piece_19, bisect_by=Plane(origin=(38, 28.791973349, -28.968007883), z_dir=(-1, 0, 0)), keep=Keep.TOP, mode=Mode.PRIVATE)
    fillet3_piece_19 = split(fillet3_piece_19, bisect_by=Plane(origin=(36.5, 28.791973349, -28.968007883), z_dir=(1, 0, 0)), keep=Keep.TOP, mode=Mode.PRIVATE)
    add(fillet3_piece_19)
    with BuildSketch(Plane(origin=(39.237079148, 31.237179148, -25.280528985), x_dir=(0.26726124191242556, 0.26726124191242556, 0.9258200997725509), z_dir=(-0.6546536707079755, -0.654653670707978, 0.377964473009229))) as fillet3_piece_20_section:
        with BuildLine():
            CenterArc((FILLET3_R * 0.377964473009, -FILLET3_R), FILLET3_R, 90, 41.409622109)
            Line((-FILLET3_R * 0.283473354757, -FILLET3_R * 0.25), (0, 0))
            Line((0, 0), (FILLET3_R * 0.377964473009, 0))
        make_face()
    fillet3_piece_20 = extrude(amount=6.070779825, mode=Mode.PRIVATE)
    fillet3_piece_20 = split(fillet3_piece_20, bisect_by=Plane(origin=(38, 30.0000375, -24.566264921), z_dir=(-1, 0, 0)), keep=Keep.TOP, mode=Mode.PRIVATE)
    add(fillet3_piece_20)
    with BuildSketch(Plane(origin=(39.731950808, 3.267949192, -42), x_dir=(0.5477225575051637, -0.5477225575051652, 0.6324555320336785), z_dir=(-0.44721359549995937, 0.4472135954999604, 0.7745966692414812))) as fillet3_piece_21_section:
        with BuildLine():
            CenterArc((FILLET3_R * 0.774596669241, FILLET3_R), FILLET3_R, 194.477512186, 75.522487814)
            Line((-FILLET3_R * 0.19364916731, FILLET3_R * 0.75), (0, 0))
            Line((0, 0), (FILLET3_R * 0.774596669241, 0))
        make_face()
    fillet3_piece_21 = extrude(amount=11.099845052, mode=Mode.PRIVATE)
    fillet3_piece_21 = split(fillet3_piece_21, bisect_by=Plane(origin=(38, 6.208026651, -36.907636464), z_dir=(-1, 0, 0)), keep=Keep.TOP, mode=Mode.PRIVATE)
    fillet3_piece_21 = split(fillet3_piece_21, bisect_by=Plane(origin=(36.5, 6.208026651, -36.907636464), z_dir=(1, 0, 0)), keep=Keep.TOP, mode=Mode.PRIVATE)
    add(fillet3_piece_21)
    with BuildSketch(Plane(origin=(39.237079148, 31.237179148, -13.851957556), x_dir=(0.2672612419124238, -0.6681531047810619, 0.6943650748294129), z_dir=(-0.6546536707079763, -0.654653670707977, -0.3779644730092292))) as fillet3_piece_22_section:
        with BuildLine():
            CenterArc((FILLET3_R * 0.377964473009, -FILLET3_R), FILLET3_R, 90, 41.409622109)
            Line((-FILLET3_R * 0.283473354757, -FILLET3_R * 0.25), (0, 0))
            Line((0, 0), (FILLET3_R * 0.377964473009, 0))
        make_face()
    fillet3_piece_22 = extrude(amount=6.070779825, mode=Mode.PRIVATE)
    fillet3_piece_22 = split(fillet3_piece_22, bisect_by=Plane(origin=(38, 30.0000375, -14.56622162), z_dir=(-1, 0, 0)), keep=Keep.TOP, mode=Mode.PRIVATE)
    add(fillet3_piece_22)
    with BuildSketch(Plane(origin=(39.731950808, 3.267949192, 2.867513459), x_dir=(0.5477225575051679, 0.8215838362577481, 0.1581138830084184), z_dir=(-0.44721359549995776, 0.44721359549995876, -0.7745966692414831))) as fillet3_piece_23_section:
        with BuildLine():
            CenterArc((FILLET3_R * 0.774596669241, FILLET3_R), FILLET3_R, 194.477512186, 75.522487814)
            Line((-FILLET3_R * 0.19364916731, FILLET3_R * 0.75), (0, 0))
            Line((0, 0), (FILLET3_R * 0.774596669241, 0))
        make_face()
    fillet3_piece_23 = extrude(amount=11.099845052, mode=Mode.PRIVATE)
    fillet3_piece_23 = split(fillet3_piece_23, bisect_by=Plane(origin=(38, 6.208026651, -2.224850076), z_dir=(-1, 0, 0)), keep=Keep.TOP, mode=Mode.PRIVATE)
    fillet3_piece_23 = split(fillet3_piece_23, bisect_by=Plane(origin=(36.5, 6.208026651, -2.224850076), z_dir=(1, 0, 0)), keep=Keep.TOP, mode=Mode.PRIVATE)
    add(fillet3_piece_23)


solid = part.part
